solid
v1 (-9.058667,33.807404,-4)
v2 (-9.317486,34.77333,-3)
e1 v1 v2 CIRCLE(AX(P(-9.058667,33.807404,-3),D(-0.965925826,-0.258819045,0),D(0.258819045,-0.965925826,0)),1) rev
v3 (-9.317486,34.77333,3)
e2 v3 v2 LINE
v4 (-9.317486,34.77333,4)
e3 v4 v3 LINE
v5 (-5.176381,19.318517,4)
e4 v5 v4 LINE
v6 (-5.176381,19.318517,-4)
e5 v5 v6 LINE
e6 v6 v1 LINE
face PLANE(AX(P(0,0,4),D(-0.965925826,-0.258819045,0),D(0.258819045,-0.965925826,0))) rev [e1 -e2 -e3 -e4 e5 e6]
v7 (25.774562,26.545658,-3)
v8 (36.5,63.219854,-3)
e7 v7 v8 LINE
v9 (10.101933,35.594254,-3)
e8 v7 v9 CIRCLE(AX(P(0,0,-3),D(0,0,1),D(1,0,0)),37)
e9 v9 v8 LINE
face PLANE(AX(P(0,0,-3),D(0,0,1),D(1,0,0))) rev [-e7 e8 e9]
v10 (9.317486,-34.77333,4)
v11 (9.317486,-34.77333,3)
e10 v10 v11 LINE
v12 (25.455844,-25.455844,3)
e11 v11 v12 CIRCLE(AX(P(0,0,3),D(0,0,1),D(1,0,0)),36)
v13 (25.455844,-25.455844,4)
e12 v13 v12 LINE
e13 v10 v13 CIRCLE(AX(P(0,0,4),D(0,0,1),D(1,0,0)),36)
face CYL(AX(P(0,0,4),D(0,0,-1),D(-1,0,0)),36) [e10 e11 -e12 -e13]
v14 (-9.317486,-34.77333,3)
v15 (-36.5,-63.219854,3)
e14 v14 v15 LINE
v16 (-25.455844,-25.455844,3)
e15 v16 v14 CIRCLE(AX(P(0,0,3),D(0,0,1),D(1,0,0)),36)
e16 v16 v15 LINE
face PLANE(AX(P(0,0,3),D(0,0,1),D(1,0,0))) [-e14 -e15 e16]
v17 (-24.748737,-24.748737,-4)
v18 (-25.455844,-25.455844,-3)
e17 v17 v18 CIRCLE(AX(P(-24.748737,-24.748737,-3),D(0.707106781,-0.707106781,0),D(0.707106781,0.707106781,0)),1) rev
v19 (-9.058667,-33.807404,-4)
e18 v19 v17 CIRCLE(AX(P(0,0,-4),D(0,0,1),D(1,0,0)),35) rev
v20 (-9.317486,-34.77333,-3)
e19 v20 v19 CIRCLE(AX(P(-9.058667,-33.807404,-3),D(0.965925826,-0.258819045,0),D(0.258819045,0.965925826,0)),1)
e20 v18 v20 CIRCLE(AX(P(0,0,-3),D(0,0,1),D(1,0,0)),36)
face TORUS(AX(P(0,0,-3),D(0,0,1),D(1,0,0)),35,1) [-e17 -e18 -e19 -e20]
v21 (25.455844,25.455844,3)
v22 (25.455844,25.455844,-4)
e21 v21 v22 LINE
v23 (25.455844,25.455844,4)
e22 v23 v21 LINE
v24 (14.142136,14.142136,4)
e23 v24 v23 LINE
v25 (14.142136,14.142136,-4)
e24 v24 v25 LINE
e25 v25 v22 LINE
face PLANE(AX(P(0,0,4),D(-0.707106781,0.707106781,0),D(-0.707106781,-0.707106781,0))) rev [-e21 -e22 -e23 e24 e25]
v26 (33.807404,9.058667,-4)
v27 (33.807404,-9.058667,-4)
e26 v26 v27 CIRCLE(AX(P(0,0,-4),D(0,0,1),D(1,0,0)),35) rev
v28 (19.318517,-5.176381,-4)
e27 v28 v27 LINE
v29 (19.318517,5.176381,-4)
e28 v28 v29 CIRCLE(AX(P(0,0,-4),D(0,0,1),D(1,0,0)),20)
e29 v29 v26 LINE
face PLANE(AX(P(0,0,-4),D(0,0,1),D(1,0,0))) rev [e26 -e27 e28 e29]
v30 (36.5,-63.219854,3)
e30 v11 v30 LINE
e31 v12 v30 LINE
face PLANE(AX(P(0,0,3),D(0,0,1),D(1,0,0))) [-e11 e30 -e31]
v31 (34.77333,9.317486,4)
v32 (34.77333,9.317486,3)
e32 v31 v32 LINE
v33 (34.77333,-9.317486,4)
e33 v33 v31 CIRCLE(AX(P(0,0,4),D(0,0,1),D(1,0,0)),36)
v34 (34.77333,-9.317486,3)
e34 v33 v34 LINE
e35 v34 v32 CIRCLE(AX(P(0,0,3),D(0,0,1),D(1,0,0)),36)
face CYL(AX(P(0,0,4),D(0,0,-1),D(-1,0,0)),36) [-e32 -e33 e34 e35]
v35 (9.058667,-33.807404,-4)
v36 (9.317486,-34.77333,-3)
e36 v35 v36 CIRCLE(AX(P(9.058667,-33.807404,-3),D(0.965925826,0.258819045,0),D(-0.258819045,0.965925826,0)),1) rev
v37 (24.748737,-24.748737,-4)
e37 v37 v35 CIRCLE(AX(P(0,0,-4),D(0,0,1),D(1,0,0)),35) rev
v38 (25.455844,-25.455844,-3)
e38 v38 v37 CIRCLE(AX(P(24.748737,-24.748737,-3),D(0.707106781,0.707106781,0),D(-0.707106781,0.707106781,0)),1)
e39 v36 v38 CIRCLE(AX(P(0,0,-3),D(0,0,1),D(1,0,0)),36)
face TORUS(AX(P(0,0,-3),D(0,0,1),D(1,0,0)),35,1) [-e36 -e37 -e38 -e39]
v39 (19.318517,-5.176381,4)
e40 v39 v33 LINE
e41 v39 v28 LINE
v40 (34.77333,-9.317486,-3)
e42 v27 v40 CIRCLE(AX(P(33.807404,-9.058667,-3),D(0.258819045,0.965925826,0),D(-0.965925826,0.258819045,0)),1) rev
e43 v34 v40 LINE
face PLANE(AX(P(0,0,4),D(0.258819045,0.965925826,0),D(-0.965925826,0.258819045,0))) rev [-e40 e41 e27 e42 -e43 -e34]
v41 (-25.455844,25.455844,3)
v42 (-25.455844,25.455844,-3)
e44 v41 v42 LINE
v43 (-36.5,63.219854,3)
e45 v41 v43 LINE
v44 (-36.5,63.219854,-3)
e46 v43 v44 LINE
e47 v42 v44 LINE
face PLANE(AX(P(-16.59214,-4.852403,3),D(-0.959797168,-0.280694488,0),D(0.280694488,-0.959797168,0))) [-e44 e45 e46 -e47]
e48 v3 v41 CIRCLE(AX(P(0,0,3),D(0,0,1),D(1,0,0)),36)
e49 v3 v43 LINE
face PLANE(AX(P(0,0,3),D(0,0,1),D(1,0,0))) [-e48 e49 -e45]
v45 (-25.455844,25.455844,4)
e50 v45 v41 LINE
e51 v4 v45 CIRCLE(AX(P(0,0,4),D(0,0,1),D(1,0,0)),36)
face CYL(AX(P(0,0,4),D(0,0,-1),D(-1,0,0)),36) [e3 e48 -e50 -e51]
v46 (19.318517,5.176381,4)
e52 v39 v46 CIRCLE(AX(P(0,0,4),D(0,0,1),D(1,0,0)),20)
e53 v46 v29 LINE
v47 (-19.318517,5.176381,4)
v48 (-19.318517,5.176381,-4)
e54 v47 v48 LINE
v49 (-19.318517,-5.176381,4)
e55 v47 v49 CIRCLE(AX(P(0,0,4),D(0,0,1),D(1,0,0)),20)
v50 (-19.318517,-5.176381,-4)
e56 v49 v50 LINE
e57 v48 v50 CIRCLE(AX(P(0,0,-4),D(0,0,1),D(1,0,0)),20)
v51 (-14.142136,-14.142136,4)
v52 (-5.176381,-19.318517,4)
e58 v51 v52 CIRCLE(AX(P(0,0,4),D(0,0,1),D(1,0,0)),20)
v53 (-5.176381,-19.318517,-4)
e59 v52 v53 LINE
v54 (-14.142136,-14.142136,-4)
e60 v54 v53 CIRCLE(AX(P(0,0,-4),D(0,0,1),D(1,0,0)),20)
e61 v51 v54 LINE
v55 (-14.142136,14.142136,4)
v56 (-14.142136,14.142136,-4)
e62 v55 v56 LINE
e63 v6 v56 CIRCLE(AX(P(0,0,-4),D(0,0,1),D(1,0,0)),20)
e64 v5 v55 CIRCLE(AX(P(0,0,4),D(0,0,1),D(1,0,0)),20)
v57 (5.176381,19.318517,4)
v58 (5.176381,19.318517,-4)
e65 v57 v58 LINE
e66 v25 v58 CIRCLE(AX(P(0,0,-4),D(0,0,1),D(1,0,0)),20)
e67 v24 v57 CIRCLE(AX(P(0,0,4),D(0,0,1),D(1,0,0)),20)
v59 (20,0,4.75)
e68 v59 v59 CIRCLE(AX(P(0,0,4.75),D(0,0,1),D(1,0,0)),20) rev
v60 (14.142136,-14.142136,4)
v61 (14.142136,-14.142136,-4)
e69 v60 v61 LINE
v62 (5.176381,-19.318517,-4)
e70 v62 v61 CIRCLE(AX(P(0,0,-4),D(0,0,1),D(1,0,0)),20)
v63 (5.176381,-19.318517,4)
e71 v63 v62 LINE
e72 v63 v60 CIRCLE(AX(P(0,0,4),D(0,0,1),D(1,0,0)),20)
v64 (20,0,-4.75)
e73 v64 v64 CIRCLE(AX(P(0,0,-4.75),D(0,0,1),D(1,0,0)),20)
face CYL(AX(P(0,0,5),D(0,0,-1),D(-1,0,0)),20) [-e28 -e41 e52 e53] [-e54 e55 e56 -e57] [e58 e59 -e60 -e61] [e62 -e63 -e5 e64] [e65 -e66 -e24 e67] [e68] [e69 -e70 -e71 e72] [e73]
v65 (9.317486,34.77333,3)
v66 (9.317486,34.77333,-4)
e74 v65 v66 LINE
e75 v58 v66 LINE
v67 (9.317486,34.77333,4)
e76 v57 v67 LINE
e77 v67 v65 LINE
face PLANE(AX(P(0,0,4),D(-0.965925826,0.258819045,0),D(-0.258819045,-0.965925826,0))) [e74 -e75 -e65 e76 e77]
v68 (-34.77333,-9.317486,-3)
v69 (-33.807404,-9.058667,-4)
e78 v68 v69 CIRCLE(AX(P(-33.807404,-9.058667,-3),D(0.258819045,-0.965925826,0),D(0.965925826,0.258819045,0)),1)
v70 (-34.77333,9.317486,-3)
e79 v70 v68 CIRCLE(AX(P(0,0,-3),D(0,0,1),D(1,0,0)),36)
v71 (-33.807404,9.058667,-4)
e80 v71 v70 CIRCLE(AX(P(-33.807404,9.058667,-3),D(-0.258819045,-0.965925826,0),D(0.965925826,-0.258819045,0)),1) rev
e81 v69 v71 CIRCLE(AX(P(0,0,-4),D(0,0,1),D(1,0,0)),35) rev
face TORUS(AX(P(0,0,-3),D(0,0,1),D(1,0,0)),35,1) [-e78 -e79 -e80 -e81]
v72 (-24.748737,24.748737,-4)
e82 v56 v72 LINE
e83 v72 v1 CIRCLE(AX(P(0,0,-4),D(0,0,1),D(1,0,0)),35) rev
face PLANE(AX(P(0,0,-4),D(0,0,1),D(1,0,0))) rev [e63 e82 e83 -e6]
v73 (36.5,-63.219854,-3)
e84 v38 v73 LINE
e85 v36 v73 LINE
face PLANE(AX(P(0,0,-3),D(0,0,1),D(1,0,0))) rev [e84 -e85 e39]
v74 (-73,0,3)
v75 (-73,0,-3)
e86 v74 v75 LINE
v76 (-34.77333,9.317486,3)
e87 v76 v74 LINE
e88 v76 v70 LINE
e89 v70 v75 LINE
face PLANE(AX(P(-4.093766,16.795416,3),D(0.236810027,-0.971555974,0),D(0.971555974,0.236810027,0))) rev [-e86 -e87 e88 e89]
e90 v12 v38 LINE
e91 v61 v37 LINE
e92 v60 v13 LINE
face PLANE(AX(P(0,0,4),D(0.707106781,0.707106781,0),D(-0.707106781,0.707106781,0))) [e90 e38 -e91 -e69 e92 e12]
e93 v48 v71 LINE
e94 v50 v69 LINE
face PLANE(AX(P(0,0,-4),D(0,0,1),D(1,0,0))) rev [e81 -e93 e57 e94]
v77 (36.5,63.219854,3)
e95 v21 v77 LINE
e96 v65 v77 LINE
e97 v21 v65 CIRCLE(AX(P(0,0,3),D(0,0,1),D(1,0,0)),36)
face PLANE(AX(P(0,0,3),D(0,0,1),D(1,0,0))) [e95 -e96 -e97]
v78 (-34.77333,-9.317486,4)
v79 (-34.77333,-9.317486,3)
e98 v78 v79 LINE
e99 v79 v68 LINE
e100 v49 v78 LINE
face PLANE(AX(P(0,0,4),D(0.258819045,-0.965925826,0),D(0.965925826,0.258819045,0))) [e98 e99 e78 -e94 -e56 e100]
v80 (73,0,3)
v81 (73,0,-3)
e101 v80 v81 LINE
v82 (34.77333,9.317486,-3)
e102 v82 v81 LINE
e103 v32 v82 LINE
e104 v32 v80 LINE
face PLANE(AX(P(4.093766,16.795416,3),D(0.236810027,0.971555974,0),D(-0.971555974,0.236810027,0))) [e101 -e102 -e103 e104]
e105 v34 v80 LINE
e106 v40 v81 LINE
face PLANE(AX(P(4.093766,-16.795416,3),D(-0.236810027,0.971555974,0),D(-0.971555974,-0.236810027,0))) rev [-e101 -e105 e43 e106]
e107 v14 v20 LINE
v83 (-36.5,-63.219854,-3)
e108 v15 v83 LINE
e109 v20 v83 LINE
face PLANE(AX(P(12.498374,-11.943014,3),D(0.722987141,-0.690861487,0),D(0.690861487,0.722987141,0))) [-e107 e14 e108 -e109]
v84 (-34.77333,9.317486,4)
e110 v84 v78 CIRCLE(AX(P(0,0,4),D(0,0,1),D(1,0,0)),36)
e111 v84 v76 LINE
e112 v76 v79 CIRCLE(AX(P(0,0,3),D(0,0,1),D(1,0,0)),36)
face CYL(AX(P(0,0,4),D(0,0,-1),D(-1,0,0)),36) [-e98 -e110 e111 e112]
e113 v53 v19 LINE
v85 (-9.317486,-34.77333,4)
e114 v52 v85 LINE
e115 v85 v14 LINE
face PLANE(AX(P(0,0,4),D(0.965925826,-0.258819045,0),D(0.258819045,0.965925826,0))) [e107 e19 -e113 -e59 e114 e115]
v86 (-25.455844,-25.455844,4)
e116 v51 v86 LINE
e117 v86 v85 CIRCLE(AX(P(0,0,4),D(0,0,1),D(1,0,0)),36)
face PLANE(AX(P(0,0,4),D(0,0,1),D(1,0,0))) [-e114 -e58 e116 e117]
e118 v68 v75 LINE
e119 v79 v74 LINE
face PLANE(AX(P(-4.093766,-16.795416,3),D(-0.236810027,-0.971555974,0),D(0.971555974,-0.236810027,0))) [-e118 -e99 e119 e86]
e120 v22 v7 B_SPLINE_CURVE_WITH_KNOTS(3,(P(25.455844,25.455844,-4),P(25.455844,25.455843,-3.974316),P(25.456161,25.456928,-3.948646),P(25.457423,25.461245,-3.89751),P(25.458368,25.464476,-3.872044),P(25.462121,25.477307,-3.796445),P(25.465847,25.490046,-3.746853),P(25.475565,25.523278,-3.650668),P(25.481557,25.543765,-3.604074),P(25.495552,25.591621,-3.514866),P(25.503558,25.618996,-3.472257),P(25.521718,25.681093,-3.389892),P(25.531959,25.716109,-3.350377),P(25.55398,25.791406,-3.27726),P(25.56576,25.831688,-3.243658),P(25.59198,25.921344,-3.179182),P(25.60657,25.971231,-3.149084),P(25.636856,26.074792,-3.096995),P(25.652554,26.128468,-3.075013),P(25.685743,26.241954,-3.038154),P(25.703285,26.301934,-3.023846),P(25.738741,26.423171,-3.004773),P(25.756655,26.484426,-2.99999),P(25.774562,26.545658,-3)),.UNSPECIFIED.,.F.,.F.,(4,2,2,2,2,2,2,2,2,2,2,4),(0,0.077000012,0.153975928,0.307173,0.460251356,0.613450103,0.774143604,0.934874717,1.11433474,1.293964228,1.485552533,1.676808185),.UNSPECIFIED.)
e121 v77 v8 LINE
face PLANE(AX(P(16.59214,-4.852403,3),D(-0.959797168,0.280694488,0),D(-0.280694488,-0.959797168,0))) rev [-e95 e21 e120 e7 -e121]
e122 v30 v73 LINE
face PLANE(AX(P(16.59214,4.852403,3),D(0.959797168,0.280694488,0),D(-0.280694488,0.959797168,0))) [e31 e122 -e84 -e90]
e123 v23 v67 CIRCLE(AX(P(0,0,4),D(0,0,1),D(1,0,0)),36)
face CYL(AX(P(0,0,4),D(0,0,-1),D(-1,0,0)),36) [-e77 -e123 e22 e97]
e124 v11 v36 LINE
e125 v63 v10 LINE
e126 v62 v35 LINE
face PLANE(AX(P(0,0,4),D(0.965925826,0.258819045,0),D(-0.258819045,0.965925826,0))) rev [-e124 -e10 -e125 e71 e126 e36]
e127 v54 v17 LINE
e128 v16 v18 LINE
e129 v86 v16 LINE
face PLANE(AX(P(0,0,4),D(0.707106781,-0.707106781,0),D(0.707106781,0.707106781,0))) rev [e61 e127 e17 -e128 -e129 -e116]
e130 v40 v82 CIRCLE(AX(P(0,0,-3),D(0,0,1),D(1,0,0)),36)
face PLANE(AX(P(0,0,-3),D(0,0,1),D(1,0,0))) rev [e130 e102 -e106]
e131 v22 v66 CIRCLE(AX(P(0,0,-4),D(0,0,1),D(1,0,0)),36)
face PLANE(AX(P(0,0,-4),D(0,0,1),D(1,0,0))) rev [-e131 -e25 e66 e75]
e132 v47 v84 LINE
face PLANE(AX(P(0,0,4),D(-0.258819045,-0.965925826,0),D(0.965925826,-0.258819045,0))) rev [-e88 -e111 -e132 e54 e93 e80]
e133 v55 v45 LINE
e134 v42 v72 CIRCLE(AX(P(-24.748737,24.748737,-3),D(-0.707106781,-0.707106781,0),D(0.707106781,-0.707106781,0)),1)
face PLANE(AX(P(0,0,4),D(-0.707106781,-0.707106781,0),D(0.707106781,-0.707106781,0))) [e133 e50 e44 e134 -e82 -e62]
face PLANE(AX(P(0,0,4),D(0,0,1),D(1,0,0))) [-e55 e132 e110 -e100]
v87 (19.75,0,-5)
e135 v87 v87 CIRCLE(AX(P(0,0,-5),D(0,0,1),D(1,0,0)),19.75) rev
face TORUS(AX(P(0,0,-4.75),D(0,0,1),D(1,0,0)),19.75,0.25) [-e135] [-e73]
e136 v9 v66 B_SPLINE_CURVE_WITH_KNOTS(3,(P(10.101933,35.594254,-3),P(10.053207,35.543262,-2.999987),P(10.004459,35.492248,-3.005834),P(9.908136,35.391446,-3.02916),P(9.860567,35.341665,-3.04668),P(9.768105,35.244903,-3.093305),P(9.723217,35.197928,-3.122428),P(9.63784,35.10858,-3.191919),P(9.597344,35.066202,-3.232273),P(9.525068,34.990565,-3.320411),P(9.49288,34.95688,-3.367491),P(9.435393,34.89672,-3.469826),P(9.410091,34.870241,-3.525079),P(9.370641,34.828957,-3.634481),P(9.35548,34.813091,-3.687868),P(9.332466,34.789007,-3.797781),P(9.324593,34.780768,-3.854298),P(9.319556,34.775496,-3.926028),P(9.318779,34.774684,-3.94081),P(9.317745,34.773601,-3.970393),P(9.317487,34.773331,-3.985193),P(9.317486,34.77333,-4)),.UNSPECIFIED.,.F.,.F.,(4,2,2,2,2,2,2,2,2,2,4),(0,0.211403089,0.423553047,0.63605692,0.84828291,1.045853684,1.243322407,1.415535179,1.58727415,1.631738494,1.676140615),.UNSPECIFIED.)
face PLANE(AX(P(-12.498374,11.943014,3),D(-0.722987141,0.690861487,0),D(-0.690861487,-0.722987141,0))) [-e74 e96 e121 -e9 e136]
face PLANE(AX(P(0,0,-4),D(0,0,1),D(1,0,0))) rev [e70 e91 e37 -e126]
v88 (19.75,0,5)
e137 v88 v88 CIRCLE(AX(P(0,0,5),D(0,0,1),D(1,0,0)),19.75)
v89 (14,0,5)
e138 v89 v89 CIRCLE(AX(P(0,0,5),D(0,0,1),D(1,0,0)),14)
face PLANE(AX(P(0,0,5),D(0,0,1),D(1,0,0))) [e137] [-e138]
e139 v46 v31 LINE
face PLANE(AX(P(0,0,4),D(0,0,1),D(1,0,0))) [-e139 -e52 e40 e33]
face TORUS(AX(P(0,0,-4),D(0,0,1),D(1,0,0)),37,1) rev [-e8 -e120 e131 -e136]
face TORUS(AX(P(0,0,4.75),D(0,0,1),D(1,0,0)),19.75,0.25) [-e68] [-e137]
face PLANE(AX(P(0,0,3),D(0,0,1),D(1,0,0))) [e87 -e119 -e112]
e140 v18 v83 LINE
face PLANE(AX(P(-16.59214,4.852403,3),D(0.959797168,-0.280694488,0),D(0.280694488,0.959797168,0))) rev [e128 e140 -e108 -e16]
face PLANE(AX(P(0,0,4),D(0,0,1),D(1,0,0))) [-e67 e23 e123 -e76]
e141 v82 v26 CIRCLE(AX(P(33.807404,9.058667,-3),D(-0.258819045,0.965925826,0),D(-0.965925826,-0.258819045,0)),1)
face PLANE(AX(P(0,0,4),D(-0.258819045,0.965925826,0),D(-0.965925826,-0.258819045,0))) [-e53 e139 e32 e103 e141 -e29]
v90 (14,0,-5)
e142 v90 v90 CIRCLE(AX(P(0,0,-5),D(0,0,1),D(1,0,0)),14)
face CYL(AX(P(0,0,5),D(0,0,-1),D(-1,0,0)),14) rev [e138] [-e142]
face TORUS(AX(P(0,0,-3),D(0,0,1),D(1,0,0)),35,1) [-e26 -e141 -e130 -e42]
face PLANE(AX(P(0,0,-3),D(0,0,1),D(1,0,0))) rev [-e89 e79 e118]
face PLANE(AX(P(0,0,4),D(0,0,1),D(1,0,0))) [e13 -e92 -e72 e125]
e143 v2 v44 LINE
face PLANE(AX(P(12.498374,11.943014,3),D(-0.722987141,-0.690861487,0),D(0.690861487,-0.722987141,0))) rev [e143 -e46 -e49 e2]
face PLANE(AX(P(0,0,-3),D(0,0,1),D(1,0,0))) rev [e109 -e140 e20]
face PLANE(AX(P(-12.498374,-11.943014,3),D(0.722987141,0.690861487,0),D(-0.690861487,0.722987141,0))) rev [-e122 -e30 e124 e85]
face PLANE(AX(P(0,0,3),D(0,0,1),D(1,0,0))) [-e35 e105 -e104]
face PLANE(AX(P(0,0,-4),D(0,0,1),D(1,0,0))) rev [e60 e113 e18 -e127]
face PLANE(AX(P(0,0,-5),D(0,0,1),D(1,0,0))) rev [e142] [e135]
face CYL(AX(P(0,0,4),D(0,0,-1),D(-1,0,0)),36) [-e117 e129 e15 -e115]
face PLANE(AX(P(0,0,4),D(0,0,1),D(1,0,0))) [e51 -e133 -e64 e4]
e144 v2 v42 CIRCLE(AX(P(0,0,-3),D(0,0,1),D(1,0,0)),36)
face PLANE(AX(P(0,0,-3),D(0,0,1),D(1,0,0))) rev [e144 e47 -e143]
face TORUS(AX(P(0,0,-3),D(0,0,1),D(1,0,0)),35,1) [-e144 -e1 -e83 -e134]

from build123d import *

# Parameters (mm, degrees)
SKETCH1_R           = 20
SKETCH1_R_2         = 14
BOSS_EXTRUDE1_DEPTH = 5
BOSS_EXTRUDE2_DEPTH = 4
BOSS_EXTRUDE3_DEPTH = 3
FILLET1_R           = 0.25
FILLET6_R           = 1


with BuildPart() as part:
    # Sketch1 → Boss-Extrude1 (new, symmetric)
    with BuildSketch(Plane.XY):
        Circle(SKETCH1_R)
        Circle(SKETCH1_R_2, mode=Mode.SUBTRACT)
    extrude(amount=BOSS_EXTRUDE1_DEPTH, both=True)

    # Sketch1<3> → Boss-Extrude2 (add, symmetric)
    with BuildSketch(Plane.XY):
        with BuildLine():
            ThreePointArc((-19.318516526, -5.176380902), (-20, 0), (-19.318516526, 5.176380902))
            Line((-19.318516526, 5.176380902), (-34.773329746, 9.317485624))
            ThreePointArc((-34.773329746, 9.317485624), (-36, 0), (-34.773329746, -9.317485624))
            Line((-34.773329746, -9.317485624), (-19.318516526, -5.176380902))
        make_face()
        with BuildLine():
            ThreePointArc((-14.142135624, 14.142135624), (-10, 17.320508076), (-5.176380902, 19.318516526))
            Line((-5.176380902, 19.318516526), (-9.317485624, 34.773329746))
            ThreePointArc((-9.317485624, 34.773329746), (-18, 31.176914536), (-25.455844123, 25.455844123))
            Line((-25.455844123, 25.455844123), (-14.142135624, 14.142135624))
        make_face()
        with BuildLine():
            ThreePointArc((5.176380902, 19.318516526), (10, 17.320508076), (14.142135624, 14.142135624))
            Line((14.142135624, 14.142135624), (25.455844123, 25.455844123))
            ThreePointArc((25.455844123, 25.455844123), (18, 31.176914536), (9.317485624, 34.773329746))
            Line((9.317485624, 34.773329746), (5.176380902, 19.318516526))
        make_face()
        with BuildLine():
            Line((34.773329746, 9.317485624), (19.318516526, 5.176380902))
            ThreePointArc((19.318516526, 5.176380902), (19.828897227, 2.610523844), (20, 0))
            ThreePointArc((20, 0), (19.828897227, -2.610523844), (19.318516526, -5.176380902))
            Line((19.318516526, -5.176380902), (34.773329746, -9.317485624))
            ThreePointArc((34.773329746, -9.317485624), (36, 0), (34.773329746, 9.317485624))
        make_face()
        with BuildLine():
            Line((25.455844123, -25.455844123), (14.142135624, -14.142135624))
            ThreePointArc((14.142135624, -14.142135624), (10, -17.320508076), (5.176380902, -19.318516526))
            Line((5.176380902, -19.318516526), (9.317485624, -34.773329746))
            ThreePointArc((9.317485624, -34.773329746), (18, -31.176914536), (25.455844123, -25.455844123))
        make_face()
        with BuildLine():
            Line((-9.317485624, -34.773329746), (-5.176380902, -19.318516526))
            ThreePointArc((-5.176380902, -19.318516526), (-10, -17.320508076), (-14.142135624, -14.142135624))
            Line((-14.142135624, -14.142135624), (-25.455844123, -25.455844123))
            ThreePointArc((-25.455844123, -25.455844123), (-18, -31.176914536), (-9.317485624, -34.773329746))
        make_face()
    extrude(amount=BOSS_EXTRUDE2_DEPTH, both=True)

    # Sketch1<4> → Boss-Extrude3 (add, symmetric)
    with BuildSketch(Plane.XY):
        with BuildLine():
            ThreePointArc((-9.317485624, 34.773329746), (-18, 31.176914536), (-25.455844123, 25.455844123))
            Line((-25.455844123, 25.455844123), (-36.5, 63.219854476))
            Line((-36.5, 63.219854476), (-9.317485624, 34.773329746))
        make_face()
        with BuildLine():
            ThreePointArc((25.455844123, 25.455844123), (18, 31.176914536), (9.317485624, 34.773329746))
            Line((9.317485624, 34.773329746), (36.5, 63.219854476))
            Line((36.5, 63.219854476), (25.455844123, 25.455844123))
        make_face()
        with BuildLine():
            ThreePointArc((34.773329746, -9.317485624), (36, 0), (34.773329746, 9.317485624))
            Line((34.773329746, 9.317485624), (73, 0))
            Line((73, 0), (34.773329746, -9.317485624))
        make_face()
        with BuildLine():
            ThreePointArc((9.317485624, -34.773329746), (18, -31.176914536), (25.455844123, -25.455844123))
            Line((25.455844123, -25.455844123), (36.5, -63.219854476))
            Line((36.5, -63.219854476), (9.317485624, -34.773329746))
        make_face()
        with BuildLine():
            ThreePointArc((-25.455844123, -25.455844123), (-18, -31.176914536), (-9.317485624, -34.773329746))
            Line((-9.317485624, -34.773329746), (-36.5, -63.219854476))
            Line((-36.5, -63.219854476), (-25.455844123, -25.455844123))
        make_face()
        with BuildLine():
            ThreePointArc((-34.773329746, 9.317485624), (-36, 0), (-34.773329746, -9.317485624))
            Line((-34.773329746, -9.317485624), (-73, 0))
            Line((-73, 0), (-34.773329746, 9.317485624))
        make_face()
    extrude(amount=BOSS_EXTRUDE3_DEPTH, both=True)

    # Fillet1
    fillet1_edges = [part.edges().sort_by_distance(p)[0] for p in [
        (-20, 0, 5),
        (-20, 0, -5),
    ]]
    fillet(fillet1_edges, radius=FILLET1_R)

    # Fillet6
    # the kernel refuses this fillet: 1 mm, written as the material it adds along each edge
    with BuildSketch(Plane(origin=(0, 0, -3), x_dir=(0.7071067811865468, 0.7071067811865483, 0), z_dir=(0.7071067811865483, -0.7071067811865468, 0))) as fillet6_piece_1_section:
        with BuildLine():
            CenterArc((36 + FILLET6_R, -FILLET6_R), FILLET6_R, 90, 90)
            Line((36 + FILLET6_R, 0), (36, 0))
            Line((36, 0), (36, -FILLET6_R))
        make_face()
    fillet6_piece_1 = revolve(axis=Axis((0, 0, -3), (0, 0, 1)), revolution_arc=30, mode=Mode.PRIVATE)
    fillet6_piece_1 = split(fillet6_piece_1, bisect_by=Plane(origin=(11.853809218, 37.427594574, -3.280987198), z_dir=(0.722987141265996, -0.6908614865253547, 0)), keep=Keep.TOP, mode=Mode.PRIVATE)
    fillet6_piece_1 = split(fillet6_piece_1, bisect_by=Plane(origin=(26.486343095, 28.979497201, -3.280987198), z_dir=(-0.9597971684602362, 0.28069448768316235, 0)), keep=Keep.TOP, mode=Mode.PRIVATE)
    add(fillet6_piece_1)
    # the kernel refuses this fillet: 1 mm, written as the material it takes off along each edge
    with BuildSketch(Plane(origin=(0, 0, -4), x_dir=(0.9456375488425219, -0.325222425762903, 0), z_dir=(-0.325222425762903, -0.9456375488425219, 0))) as fillet6_2_piece_1:
        with BuildLine():
            CenterArc((36 - FILLET6_R, FILLET6_R), FILLET6_R, 270, 90)
            Line((36 - FILLET6_R, 0), (36, 0))
            Line((36, 0), (36, FILLET6_R))
        make_face()
    revolve(axis=Axis((0, 0, -4), (0, 0, 1)), revolution_arc=37.958102254, mode=Mode.SUBTRACT)
    with BuildSketch(Plane(origin=(0, 0, -4), x_dir=(0.19116789183018731, -0.9815573529515235, 0), z_dir=(-0.9815573529515235, -0.19116789183018731, 0))) as fillet6_2_piece_2:
        with BuildLine():
            CenterArc((36 - FILLET6_R, FILLET6_R), FILLET6_R, 270, 90)
            Line((36, FILLET6_R), (36, 0))
            Line((36, 0), (36 - FILLET6_R, 0))
        make_face()
    revolve(axis=Axis((0, 0, -4), (0, 0, 1)), revolution_arc=37.958102254, mode=Mode.SUBTRACT)
    with BuildSketch(Plane(origin=(0, 0, -4), x_dir=(-0.7544696570123329, -0.6563349271886211, 0), z_dir=(-0.6563349271886211, 0.7544696570123329, 0))) as fillet6_2_piece_3:
        with BuildLine():
            CenterArc((36 - FILLET6_R, FILLET6_R), FILLET6_R, 270, 90)
            Line((36, FILLET6_R), (36, 0))
            Line((36, 0), (36 - FILLET6_R, 0))
        make_face()
    revolve(axis=Axis((0, 0, -4), (0, 0, 1)), revolution_arc=37.958102254, mode=Mode.SUBTRACT)
    with BuildSketch(Plane(origin=(0, 0, -4), x_dir=(-0.9456375488425217, 0.32522242576290356, 0), z_dir=(0.32522242576290356, 0.9456375488425217, 0))) as fillet6_2_piece_4:
        with BuildLine():
            CenterArc((36 - FILLET6_R, FILLET6_R), FILLET6_R, 270, 90)
            Line((36 - FILLET6_R, 0), (36, 0))
            Line((36, 0), (36, FILLET6_R))
        make_face()
    revolve(axis=Axis((0, 0, -4), (0, 0, 1)), revolution_arc=37.958102254, mode=Mode.SUBTRACT)
    with BuildSketch(Plane(origin=(0, 0, -4), x_dir=(-0.19116789183018898, 0.9815573529515234, 0), z_dir=(0.9815573529515234, 0.19116789183018898, 0))) as fillet6_2_piece_5:
        with BuildLine():
            CenterArc((36 - FILLET6_R, FILLET6_R), FILLET6_R, 270, 90)
            Line((36 - FILLET6_R, 0), (36, 0))
            Line((36, 0), (36, FILLET6_R))
        make_face()
    revolve(axis=Axis((0, 0, -4), (0, 0, 1)), revolution_arc=37.958102254, mode=Mode.SUBTRACT)


solid = part.part
